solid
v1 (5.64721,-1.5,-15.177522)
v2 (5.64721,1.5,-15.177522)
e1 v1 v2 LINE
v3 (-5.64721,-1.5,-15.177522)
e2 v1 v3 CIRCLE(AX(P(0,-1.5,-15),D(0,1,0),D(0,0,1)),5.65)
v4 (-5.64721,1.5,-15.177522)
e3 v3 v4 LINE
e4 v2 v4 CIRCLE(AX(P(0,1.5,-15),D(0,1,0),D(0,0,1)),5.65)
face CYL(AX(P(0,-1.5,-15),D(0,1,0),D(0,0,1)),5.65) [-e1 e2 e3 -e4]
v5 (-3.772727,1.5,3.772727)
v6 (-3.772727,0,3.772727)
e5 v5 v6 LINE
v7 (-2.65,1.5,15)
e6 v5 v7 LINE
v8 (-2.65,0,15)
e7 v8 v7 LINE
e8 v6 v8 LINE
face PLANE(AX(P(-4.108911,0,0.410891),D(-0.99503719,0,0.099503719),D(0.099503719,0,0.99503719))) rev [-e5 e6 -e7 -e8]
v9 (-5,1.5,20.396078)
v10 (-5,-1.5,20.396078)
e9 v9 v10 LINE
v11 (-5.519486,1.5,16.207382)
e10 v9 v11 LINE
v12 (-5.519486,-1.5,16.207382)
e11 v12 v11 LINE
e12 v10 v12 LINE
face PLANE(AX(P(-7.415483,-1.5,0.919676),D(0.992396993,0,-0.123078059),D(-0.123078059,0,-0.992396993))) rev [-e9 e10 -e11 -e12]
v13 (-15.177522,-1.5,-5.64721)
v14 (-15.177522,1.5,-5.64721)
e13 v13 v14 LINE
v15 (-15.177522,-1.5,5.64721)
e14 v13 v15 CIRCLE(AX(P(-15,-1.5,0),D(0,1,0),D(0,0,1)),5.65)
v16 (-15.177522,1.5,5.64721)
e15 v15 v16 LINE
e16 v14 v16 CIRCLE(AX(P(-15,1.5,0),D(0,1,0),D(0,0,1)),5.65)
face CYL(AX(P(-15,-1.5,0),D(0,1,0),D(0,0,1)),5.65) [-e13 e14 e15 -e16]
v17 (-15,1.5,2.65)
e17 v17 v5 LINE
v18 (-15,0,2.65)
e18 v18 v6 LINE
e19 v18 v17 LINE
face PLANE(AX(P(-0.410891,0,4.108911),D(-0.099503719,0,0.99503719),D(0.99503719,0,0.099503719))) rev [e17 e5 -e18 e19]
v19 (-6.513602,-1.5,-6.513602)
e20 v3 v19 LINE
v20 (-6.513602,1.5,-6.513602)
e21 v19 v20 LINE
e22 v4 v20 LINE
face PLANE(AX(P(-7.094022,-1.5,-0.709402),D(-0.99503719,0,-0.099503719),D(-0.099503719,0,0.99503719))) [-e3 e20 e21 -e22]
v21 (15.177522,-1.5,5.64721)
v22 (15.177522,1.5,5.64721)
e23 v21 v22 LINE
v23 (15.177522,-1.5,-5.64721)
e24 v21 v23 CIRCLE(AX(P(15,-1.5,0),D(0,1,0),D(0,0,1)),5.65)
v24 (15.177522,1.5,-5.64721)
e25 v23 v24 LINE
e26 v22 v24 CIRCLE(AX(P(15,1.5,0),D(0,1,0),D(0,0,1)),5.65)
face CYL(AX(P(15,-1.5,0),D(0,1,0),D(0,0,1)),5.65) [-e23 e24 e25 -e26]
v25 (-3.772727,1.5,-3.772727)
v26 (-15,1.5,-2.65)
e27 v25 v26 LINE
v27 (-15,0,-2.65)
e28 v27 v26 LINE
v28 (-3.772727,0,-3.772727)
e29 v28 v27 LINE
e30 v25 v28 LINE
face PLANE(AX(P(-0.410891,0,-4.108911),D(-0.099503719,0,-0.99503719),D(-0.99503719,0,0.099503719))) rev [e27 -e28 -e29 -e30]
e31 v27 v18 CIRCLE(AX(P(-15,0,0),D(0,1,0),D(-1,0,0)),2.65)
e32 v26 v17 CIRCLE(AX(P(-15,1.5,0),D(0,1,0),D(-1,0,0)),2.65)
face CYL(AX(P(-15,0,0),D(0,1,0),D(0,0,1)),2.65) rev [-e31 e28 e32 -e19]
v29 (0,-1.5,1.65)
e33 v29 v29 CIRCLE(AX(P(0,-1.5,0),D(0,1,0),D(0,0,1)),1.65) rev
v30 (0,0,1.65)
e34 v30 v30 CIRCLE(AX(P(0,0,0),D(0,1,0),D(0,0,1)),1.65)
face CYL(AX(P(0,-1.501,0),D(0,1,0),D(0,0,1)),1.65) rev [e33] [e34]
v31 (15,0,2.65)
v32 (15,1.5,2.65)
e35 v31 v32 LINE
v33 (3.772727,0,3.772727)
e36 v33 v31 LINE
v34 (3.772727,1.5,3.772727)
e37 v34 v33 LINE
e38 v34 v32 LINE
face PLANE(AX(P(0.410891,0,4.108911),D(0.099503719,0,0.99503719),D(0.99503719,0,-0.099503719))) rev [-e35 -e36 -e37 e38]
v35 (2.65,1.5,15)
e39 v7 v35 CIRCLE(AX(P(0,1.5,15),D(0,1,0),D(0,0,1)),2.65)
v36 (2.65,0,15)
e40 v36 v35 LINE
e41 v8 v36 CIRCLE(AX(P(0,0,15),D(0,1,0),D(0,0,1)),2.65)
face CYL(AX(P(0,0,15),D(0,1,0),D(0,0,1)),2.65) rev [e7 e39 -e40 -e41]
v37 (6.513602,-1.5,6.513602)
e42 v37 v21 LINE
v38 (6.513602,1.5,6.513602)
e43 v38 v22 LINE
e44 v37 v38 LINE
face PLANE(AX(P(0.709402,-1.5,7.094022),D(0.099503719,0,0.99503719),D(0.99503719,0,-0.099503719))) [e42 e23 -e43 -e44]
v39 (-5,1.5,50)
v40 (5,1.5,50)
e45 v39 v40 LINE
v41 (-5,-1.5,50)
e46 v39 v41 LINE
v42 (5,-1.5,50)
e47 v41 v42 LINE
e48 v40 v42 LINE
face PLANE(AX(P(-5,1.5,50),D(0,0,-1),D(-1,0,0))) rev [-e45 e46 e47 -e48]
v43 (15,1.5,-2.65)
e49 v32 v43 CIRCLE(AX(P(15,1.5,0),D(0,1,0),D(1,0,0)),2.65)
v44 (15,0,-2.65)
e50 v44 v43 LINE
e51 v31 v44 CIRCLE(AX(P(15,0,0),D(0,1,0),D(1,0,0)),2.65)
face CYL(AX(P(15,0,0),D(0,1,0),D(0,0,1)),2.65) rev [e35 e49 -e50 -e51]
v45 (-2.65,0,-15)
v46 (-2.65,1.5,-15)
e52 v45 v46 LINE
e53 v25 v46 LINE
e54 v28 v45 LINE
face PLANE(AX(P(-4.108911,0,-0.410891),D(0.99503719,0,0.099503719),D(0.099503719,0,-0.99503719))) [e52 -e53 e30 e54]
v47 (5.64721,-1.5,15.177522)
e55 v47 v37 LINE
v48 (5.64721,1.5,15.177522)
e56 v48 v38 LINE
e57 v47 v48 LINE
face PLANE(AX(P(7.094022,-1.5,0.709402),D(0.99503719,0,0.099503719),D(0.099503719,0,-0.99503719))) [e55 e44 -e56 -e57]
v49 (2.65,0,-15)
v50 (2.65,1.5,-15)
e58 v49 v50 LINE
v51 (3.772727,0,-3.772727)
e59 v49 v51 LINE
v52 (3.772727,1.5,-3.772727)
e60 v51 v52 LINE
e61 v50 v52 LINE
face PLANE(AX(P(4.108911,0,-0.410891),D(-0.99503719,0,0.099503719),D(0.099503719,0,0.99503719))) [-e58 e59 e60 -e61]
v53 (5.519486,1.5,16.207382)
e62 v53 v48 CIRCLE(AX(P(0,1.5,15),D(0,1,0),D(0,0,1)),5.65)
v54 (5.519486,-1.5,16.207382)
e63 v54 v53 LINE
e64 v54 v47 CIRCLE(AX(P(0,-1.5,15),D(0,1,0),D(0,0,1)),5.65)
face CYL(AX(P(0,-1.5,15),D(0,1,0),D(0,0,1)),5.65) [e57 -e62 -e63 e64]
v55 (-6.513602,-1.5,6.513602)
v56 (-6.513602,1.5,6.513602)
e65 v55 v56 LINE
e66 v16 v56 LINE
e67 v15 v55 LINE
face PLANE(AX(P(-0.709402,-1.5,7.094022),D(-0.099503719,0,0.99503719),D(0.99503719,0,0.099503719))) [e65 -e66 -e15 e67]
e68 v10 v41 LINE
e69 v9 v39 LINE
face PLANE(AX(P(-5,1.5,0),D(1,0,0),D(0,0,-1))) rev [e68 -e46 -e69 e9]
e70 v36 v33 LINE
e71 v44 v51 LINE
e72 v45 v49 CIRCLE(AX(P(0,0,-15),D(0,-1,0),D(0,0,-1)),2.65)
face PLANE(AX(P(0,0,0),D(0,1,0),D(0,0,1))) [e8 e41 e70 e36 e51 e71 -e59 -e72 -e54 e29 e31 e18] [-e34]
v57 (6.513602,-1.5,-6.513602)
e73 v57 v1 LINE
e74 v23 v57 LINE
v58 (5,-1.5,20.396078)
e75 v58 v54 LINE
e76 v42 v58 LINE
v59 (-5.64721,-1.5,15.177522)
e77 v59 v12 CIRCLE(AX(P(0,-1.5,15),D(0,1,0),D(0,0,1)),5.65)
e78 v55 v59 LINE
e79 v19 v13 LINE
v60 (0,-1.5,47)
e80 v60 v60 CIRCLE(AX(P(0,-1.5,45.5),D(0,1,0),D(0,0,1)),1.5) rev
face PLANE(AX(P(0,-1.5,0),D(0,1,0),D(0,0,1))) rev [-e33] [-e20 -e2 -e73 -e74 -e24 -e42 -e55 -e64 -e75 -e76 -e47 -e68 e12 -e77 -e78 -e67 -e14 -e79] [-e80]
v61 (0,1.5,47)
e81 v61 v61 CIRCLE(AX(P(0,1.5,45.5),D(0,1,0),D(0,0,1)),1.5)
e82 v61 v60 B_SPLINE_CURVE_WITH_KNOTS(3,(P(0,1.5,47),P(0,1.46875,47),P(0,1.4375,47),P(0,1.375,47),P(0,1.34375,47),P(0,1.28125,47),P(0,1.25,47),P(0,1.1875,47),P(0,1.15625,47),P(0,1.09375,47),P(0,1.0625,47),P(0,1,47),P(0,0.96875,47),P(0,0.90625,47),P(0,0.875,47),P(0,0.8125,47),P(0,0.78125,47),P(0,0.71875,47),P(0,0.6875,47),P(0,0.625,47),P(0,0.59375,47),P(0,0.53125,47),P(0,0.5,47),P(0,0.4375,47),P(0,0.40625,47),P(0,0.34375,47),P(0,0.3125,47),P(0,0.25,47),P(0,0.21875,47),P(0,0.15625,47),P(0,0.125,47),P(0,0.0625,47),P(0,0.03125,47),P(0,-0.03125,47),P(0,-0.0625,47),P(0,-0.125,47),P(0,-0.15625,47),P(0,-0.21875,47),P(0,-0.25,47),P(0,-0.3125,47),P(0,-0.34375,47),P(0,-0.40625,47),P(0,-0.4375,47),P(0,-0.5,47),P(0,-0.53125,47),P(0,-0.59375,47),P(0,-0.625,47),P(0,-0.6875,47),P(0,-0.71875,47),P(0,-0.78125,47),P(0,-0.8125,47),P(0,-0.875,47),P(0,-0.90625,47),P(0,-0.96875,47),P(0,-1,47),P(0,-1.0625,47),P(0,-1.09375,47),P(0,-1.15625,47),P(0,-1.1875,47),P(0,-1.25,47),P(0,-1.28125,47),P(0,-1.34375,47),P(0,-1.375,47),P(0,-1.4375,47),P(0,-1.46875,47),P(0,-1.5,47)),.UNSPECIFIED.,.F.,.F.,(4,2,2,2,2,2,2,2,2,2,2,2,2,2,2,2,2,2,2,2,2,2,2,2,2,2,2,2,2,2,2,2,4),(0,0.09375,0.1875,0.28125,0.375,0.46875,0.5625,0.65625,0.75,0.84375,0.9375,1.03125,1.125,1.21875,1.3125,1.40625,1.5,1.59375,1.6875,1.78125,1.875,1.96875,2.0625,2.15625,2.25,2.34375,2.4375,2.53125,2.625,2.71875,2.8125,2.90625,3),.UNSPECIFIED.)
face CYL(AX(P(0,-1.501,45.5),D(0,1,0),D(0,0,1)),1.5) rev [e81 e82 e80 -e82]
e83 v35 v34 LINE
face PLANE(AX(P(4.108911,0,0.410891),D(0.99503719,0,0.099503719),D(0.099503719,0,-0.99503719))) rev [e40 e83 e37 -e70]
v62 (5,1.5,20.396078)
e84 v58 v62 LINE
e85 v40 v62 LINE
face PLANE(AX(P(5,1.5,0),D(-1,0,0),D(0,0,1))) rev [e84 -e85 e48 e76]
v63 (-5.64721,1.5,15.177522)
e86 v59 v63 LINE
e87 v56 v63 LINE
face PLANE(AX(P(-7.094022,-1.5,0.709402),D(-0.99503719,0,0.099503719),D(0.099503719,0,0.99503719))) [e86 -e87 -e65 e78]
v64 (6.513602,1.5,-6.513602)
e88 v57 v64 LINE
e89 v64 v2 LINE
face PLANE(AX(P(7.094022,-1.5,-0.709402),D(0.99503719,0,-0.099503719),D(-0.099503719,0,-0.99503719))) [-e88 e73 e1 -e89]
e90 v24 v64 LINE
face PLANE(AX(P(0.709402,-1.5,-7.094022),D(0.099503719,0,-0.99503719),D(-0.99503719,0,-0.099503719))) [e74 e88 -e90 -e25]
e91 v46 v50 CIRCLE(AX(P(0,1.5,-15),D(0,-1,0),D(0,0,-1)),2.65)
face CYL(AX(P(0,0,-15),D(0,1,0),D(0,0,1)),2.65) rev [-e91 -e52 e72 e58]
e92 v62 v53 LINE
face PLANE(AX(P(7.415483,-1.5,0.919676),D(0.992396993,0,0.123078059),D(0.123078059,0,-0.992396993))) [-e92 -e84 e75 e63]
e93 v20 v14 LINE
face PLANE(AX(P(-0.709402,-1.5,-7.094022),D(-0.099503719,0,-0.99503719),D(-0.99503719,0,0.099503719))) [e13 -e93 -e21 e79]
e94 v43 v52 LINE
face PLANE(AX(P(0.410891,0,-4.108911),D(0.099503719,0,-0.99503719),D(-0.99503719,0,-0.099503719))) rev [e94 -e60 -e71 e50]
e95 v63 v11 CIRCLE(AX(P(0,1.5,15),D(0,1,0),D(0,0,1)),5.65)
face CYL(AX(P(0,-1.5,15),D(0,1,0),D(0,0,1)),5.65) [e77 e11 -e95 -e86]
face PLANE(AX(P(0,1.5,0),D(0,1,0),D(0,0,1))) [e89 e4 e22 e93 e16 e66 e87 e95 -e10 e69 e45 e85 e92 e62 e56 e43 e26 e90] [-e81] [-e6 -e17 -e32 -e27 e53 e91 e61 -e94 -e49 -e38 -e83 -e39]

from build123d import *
from build123d.topology import SkipClean

# Parameters (mm, degrees)
SKETCH1_R               = 21
BOSS_EXTRUDE1_DEPTH     = 1.5
SKETCH2_R               = 2.65
CUT_EXTRUDE1_DEPTH      = 1.5
SKETCH5_W               = 10
SKETCH5_H               = 50
BOSS_EXTRUDE2_DEPTH     = 1.5
CIRPATTERN1_DEPTH       = 1.5
CUT_EXTRUDE4_REACH      = 56.252
SKETCH4_R               = 1.65
CUT_EXTRUDE5_REACH      = 56.314
SKETCH6_R               = 1.5
CUT_EXTRUDE6_DEPTH      = 55.251728083
CUT_EXTRUDE6_DEPTH_BACK = 55.251728083


# Read off the part's stored shape, not the designer's step: CirPattern1
with BuildPart() as part:
    # Sketch1 → Boss-Extrude1 (new, symmetric)
    with BuildSketch(Plane(origin=(0, 0, 0), x_dir=(1, 0, 0), z_dir=(0, 1, 0))):
        with Locations(Location((0, 0, 0), (0, 0, 270))):
            Circle(SKETCH1_R)
    extrude(amount=BOSS_EXTRUDE1_DEPTH, both=True)

    # Sketch2 → Cut-Extrude1 (cut)
    with BuildSketch(Plane(origin=(0, 1.5, 0), x_dir=(1, 0, 0), z_dir=(0, 1, 0))):
        with Locations((0, -15)):
            Circle(SKETCH2_R)
        with BuildLine():
            ThreePointArc((-2.65, -15), (0, -12.35), (2.65, -15))
            Line((2.65, -15), (4.067821782, -0.821782178))
            ThreePointArc((4.067821782, -0.821782178), (0, -4.15), (-4.067821782, -0.821782178))
            Line((-4.067821782, -0.821782178), (-2.65, -15))
        make_face()
        with BuildLine():
            ThreePointArc((-4.067821782, -0.821782178), (0, -4.15), (4.067821782, -0.821782178))
            Line((4.067821782, -0.821782178), (4.15, 0))
            ThreePointArc((4.15, 0), (0, 4.15), (-4.15, 0))
            Line((-4.15, 0), (-4.067821782, -0.821782178))
        make_face()
    cut_extrude1 = extrude(amount=-CUT_EXTRUDE1_DEPTH, mode=Mode.SUBTRACT)

    # Sketch5 → Boss-Extrude2 (add, symmetric)
    with BuildSketch(Plane(origin=(0, 0, 0), x_dir=(1, 0, 0), z_dir=(0, 1, 0))):
        with Locations((0, -25)):
            Rectangle(SKETCH5_W, SKETCH5_H)
    extrude(amount=BOSS_EXTRUDE2_DEPTH, both=True)

    # Mirror1: Cut-Extrude1 across plane
    with SkipClean():  # the faces are left unmerged after this step: merging them gives an invalid solid
        add(cut_extrude1.mirror(Plane.XY), mode=Mode.SUBTRACT)

    # CirPattern1 outline → CirPattern1 (cut)
    with BuildSketch(Plane(origin=(0, 0, 0), x_dir=(1, 0, 0), z_dir=(0, 1, 0))):
        with BuildLine():
            Line((3.772727273, -3.772727273), (15, -2.65))
            ThreePointArc((15, -2.65), (17.65, 0), (15, 2.65))
            Line((15, 2.65), (3.772727273, 3.772727273))
            Line((3.772727273, 3.772727273), (4.067821782, 0.821782178))
            ThreePointArc((4.067821782, 0.821782178), (0, -4.15), (-4.067821782, 0.821782178))
            Line((-4.067821782, 0.821782178), (-3.772727273, 3.772727273))
            Line((-3.772727273, 3.772727273), (-15, 2.65))
            ThreePointArc((-15, 2.65), (-17.65, 0), (-15, -2.65))
            Line((-15, -2.65), (-3.772727273, -3.772727273))
            Line((-3.772727273, -3.772727273), (-2.65, -15))
            ThreePointArc((-2.65, -15), (0, -17.65), (2.65, -15))
            Line((2.65, -15), (3.772727273, -3.772727273))
        make_face()
    extrude(amount=CIRPATTERN1_DEPTH, mode=Mode.SUBTRACT)

    # Sketch4 → Cut-Extrude4 (cut, up to next)
    with BuildSketch(Plane(origin=(0, 0, 0), x_dir=(1, 0, 0), z_dir=(0, 1, 0)), mode=Mode.PRIVATE) as cut_extrude4_sk1:
        with Locations(Location((0, 0, 0), (0, 0, 270))):
            Circle(SKETCH4_R)
    cut_extrude4_tool1 = extrude(cut_extrude4_sk1.sketch, amount=-CUT_EXTRUDE4_REACH, mode=Mode.PRIVATE) & part.part
    add(cut_extrude4_tool1.solids().sort_by_distance((0, 0, 0))[0], mode=Mode.SUBTRACT)

    # Sketch6 → Cut-Extrude5 (cut, up to next)
    with BuildSketch(Plane(origin=(0, 1.5, 0), x_dir=(1, 0, 0), z_dir=(0, 1, 0)), mode=Mode.PRIVATE) as cut_extrude5_sk1:
        with Locations(Location((0, -45.5, 0), (0, 0, 270))):
            Circle(SKETCH6_R)
    cut_extrude5_tool1 = extrude(cut_extrude5_sk1.sketch, amount=-CUT_EXTRUDE5_REACH, mode=Mode.PRIVATE) & part.part
    add(cut_extrude5_tool1.solids().sort_by_distance((0, 1.5, 45.5))[0], mode=Mode.SUBTRACT)

    # Sketch7 → Cut-Extrude6 (cut, two sides: drawn at the far end of the back side and taken through both)
    with BuildSketch(Plane(origin=(0, 0, 0), x_dir=(1, 0, 0), z_dir=(0, 1, 0)).offset(-CUT_EXTRUDE6_DEPTH_BACK)):
        with BuildLine():
            ThreePointArc((5, -20.396078054), (0, 21), (-5, -20.396078054))
            Line((-5, -20.396078054), (-5.519486194, -16.207382355))
            ThreePointArc((-5.519486194, -16.207382355), (-5.607043009, -15.695391034), (-5.647210443, -15.177522436))
            Line((-5.647210443, -15.177522436), (-6.513602442, -6.513602442))
            Line((-6.513602442, -6.513602442), (-15.177522436, -5.647210443))
            ThreePointArc((-15.177522436, -5.647210443), (-20.65, 0), (-15.177522436, 5.647210443))
            Line((-15.177522436, 5.647210443), (-6.513602442, 6.513602442))
            Line((-6.513602442, 6.513602442), (-5.647210443, 15.177522436))
            ThreePointArc((-5.647210443, 15.177522436), (0, 20.65), (5.647210443, 15.177522436))
            Line((5.647210443, 15.177522436), (6.513602442, 6.513602442))
            Line((6.513602442, 6.513602442), (15.177522436, 5.647210443))
            ThreePointArc((15.177522436, 5.647210443), (20.65, 0), (15.177522436, -5.647210443))
            Line((15.177522436, -5.647210443), (6.513602442, -6.513602442))
            Line((6.513602442, -6.513602442), (5.647210443, -15.177522436))
            ThreePointArc((5.647210443, -15.177522436), (5.607043009, -15.695391034), (5.519486194, -16.207382355))
            Line((5.519486194, -16.207382355), (5, -20.396078054))
        make_face()
    extrude(amount=CUT_EXTRUDE6_DEPTH + CUT_EXTRUDE6_DEPTH_BACK, mode=Mode.SUBTRACT)


solid = part.part
